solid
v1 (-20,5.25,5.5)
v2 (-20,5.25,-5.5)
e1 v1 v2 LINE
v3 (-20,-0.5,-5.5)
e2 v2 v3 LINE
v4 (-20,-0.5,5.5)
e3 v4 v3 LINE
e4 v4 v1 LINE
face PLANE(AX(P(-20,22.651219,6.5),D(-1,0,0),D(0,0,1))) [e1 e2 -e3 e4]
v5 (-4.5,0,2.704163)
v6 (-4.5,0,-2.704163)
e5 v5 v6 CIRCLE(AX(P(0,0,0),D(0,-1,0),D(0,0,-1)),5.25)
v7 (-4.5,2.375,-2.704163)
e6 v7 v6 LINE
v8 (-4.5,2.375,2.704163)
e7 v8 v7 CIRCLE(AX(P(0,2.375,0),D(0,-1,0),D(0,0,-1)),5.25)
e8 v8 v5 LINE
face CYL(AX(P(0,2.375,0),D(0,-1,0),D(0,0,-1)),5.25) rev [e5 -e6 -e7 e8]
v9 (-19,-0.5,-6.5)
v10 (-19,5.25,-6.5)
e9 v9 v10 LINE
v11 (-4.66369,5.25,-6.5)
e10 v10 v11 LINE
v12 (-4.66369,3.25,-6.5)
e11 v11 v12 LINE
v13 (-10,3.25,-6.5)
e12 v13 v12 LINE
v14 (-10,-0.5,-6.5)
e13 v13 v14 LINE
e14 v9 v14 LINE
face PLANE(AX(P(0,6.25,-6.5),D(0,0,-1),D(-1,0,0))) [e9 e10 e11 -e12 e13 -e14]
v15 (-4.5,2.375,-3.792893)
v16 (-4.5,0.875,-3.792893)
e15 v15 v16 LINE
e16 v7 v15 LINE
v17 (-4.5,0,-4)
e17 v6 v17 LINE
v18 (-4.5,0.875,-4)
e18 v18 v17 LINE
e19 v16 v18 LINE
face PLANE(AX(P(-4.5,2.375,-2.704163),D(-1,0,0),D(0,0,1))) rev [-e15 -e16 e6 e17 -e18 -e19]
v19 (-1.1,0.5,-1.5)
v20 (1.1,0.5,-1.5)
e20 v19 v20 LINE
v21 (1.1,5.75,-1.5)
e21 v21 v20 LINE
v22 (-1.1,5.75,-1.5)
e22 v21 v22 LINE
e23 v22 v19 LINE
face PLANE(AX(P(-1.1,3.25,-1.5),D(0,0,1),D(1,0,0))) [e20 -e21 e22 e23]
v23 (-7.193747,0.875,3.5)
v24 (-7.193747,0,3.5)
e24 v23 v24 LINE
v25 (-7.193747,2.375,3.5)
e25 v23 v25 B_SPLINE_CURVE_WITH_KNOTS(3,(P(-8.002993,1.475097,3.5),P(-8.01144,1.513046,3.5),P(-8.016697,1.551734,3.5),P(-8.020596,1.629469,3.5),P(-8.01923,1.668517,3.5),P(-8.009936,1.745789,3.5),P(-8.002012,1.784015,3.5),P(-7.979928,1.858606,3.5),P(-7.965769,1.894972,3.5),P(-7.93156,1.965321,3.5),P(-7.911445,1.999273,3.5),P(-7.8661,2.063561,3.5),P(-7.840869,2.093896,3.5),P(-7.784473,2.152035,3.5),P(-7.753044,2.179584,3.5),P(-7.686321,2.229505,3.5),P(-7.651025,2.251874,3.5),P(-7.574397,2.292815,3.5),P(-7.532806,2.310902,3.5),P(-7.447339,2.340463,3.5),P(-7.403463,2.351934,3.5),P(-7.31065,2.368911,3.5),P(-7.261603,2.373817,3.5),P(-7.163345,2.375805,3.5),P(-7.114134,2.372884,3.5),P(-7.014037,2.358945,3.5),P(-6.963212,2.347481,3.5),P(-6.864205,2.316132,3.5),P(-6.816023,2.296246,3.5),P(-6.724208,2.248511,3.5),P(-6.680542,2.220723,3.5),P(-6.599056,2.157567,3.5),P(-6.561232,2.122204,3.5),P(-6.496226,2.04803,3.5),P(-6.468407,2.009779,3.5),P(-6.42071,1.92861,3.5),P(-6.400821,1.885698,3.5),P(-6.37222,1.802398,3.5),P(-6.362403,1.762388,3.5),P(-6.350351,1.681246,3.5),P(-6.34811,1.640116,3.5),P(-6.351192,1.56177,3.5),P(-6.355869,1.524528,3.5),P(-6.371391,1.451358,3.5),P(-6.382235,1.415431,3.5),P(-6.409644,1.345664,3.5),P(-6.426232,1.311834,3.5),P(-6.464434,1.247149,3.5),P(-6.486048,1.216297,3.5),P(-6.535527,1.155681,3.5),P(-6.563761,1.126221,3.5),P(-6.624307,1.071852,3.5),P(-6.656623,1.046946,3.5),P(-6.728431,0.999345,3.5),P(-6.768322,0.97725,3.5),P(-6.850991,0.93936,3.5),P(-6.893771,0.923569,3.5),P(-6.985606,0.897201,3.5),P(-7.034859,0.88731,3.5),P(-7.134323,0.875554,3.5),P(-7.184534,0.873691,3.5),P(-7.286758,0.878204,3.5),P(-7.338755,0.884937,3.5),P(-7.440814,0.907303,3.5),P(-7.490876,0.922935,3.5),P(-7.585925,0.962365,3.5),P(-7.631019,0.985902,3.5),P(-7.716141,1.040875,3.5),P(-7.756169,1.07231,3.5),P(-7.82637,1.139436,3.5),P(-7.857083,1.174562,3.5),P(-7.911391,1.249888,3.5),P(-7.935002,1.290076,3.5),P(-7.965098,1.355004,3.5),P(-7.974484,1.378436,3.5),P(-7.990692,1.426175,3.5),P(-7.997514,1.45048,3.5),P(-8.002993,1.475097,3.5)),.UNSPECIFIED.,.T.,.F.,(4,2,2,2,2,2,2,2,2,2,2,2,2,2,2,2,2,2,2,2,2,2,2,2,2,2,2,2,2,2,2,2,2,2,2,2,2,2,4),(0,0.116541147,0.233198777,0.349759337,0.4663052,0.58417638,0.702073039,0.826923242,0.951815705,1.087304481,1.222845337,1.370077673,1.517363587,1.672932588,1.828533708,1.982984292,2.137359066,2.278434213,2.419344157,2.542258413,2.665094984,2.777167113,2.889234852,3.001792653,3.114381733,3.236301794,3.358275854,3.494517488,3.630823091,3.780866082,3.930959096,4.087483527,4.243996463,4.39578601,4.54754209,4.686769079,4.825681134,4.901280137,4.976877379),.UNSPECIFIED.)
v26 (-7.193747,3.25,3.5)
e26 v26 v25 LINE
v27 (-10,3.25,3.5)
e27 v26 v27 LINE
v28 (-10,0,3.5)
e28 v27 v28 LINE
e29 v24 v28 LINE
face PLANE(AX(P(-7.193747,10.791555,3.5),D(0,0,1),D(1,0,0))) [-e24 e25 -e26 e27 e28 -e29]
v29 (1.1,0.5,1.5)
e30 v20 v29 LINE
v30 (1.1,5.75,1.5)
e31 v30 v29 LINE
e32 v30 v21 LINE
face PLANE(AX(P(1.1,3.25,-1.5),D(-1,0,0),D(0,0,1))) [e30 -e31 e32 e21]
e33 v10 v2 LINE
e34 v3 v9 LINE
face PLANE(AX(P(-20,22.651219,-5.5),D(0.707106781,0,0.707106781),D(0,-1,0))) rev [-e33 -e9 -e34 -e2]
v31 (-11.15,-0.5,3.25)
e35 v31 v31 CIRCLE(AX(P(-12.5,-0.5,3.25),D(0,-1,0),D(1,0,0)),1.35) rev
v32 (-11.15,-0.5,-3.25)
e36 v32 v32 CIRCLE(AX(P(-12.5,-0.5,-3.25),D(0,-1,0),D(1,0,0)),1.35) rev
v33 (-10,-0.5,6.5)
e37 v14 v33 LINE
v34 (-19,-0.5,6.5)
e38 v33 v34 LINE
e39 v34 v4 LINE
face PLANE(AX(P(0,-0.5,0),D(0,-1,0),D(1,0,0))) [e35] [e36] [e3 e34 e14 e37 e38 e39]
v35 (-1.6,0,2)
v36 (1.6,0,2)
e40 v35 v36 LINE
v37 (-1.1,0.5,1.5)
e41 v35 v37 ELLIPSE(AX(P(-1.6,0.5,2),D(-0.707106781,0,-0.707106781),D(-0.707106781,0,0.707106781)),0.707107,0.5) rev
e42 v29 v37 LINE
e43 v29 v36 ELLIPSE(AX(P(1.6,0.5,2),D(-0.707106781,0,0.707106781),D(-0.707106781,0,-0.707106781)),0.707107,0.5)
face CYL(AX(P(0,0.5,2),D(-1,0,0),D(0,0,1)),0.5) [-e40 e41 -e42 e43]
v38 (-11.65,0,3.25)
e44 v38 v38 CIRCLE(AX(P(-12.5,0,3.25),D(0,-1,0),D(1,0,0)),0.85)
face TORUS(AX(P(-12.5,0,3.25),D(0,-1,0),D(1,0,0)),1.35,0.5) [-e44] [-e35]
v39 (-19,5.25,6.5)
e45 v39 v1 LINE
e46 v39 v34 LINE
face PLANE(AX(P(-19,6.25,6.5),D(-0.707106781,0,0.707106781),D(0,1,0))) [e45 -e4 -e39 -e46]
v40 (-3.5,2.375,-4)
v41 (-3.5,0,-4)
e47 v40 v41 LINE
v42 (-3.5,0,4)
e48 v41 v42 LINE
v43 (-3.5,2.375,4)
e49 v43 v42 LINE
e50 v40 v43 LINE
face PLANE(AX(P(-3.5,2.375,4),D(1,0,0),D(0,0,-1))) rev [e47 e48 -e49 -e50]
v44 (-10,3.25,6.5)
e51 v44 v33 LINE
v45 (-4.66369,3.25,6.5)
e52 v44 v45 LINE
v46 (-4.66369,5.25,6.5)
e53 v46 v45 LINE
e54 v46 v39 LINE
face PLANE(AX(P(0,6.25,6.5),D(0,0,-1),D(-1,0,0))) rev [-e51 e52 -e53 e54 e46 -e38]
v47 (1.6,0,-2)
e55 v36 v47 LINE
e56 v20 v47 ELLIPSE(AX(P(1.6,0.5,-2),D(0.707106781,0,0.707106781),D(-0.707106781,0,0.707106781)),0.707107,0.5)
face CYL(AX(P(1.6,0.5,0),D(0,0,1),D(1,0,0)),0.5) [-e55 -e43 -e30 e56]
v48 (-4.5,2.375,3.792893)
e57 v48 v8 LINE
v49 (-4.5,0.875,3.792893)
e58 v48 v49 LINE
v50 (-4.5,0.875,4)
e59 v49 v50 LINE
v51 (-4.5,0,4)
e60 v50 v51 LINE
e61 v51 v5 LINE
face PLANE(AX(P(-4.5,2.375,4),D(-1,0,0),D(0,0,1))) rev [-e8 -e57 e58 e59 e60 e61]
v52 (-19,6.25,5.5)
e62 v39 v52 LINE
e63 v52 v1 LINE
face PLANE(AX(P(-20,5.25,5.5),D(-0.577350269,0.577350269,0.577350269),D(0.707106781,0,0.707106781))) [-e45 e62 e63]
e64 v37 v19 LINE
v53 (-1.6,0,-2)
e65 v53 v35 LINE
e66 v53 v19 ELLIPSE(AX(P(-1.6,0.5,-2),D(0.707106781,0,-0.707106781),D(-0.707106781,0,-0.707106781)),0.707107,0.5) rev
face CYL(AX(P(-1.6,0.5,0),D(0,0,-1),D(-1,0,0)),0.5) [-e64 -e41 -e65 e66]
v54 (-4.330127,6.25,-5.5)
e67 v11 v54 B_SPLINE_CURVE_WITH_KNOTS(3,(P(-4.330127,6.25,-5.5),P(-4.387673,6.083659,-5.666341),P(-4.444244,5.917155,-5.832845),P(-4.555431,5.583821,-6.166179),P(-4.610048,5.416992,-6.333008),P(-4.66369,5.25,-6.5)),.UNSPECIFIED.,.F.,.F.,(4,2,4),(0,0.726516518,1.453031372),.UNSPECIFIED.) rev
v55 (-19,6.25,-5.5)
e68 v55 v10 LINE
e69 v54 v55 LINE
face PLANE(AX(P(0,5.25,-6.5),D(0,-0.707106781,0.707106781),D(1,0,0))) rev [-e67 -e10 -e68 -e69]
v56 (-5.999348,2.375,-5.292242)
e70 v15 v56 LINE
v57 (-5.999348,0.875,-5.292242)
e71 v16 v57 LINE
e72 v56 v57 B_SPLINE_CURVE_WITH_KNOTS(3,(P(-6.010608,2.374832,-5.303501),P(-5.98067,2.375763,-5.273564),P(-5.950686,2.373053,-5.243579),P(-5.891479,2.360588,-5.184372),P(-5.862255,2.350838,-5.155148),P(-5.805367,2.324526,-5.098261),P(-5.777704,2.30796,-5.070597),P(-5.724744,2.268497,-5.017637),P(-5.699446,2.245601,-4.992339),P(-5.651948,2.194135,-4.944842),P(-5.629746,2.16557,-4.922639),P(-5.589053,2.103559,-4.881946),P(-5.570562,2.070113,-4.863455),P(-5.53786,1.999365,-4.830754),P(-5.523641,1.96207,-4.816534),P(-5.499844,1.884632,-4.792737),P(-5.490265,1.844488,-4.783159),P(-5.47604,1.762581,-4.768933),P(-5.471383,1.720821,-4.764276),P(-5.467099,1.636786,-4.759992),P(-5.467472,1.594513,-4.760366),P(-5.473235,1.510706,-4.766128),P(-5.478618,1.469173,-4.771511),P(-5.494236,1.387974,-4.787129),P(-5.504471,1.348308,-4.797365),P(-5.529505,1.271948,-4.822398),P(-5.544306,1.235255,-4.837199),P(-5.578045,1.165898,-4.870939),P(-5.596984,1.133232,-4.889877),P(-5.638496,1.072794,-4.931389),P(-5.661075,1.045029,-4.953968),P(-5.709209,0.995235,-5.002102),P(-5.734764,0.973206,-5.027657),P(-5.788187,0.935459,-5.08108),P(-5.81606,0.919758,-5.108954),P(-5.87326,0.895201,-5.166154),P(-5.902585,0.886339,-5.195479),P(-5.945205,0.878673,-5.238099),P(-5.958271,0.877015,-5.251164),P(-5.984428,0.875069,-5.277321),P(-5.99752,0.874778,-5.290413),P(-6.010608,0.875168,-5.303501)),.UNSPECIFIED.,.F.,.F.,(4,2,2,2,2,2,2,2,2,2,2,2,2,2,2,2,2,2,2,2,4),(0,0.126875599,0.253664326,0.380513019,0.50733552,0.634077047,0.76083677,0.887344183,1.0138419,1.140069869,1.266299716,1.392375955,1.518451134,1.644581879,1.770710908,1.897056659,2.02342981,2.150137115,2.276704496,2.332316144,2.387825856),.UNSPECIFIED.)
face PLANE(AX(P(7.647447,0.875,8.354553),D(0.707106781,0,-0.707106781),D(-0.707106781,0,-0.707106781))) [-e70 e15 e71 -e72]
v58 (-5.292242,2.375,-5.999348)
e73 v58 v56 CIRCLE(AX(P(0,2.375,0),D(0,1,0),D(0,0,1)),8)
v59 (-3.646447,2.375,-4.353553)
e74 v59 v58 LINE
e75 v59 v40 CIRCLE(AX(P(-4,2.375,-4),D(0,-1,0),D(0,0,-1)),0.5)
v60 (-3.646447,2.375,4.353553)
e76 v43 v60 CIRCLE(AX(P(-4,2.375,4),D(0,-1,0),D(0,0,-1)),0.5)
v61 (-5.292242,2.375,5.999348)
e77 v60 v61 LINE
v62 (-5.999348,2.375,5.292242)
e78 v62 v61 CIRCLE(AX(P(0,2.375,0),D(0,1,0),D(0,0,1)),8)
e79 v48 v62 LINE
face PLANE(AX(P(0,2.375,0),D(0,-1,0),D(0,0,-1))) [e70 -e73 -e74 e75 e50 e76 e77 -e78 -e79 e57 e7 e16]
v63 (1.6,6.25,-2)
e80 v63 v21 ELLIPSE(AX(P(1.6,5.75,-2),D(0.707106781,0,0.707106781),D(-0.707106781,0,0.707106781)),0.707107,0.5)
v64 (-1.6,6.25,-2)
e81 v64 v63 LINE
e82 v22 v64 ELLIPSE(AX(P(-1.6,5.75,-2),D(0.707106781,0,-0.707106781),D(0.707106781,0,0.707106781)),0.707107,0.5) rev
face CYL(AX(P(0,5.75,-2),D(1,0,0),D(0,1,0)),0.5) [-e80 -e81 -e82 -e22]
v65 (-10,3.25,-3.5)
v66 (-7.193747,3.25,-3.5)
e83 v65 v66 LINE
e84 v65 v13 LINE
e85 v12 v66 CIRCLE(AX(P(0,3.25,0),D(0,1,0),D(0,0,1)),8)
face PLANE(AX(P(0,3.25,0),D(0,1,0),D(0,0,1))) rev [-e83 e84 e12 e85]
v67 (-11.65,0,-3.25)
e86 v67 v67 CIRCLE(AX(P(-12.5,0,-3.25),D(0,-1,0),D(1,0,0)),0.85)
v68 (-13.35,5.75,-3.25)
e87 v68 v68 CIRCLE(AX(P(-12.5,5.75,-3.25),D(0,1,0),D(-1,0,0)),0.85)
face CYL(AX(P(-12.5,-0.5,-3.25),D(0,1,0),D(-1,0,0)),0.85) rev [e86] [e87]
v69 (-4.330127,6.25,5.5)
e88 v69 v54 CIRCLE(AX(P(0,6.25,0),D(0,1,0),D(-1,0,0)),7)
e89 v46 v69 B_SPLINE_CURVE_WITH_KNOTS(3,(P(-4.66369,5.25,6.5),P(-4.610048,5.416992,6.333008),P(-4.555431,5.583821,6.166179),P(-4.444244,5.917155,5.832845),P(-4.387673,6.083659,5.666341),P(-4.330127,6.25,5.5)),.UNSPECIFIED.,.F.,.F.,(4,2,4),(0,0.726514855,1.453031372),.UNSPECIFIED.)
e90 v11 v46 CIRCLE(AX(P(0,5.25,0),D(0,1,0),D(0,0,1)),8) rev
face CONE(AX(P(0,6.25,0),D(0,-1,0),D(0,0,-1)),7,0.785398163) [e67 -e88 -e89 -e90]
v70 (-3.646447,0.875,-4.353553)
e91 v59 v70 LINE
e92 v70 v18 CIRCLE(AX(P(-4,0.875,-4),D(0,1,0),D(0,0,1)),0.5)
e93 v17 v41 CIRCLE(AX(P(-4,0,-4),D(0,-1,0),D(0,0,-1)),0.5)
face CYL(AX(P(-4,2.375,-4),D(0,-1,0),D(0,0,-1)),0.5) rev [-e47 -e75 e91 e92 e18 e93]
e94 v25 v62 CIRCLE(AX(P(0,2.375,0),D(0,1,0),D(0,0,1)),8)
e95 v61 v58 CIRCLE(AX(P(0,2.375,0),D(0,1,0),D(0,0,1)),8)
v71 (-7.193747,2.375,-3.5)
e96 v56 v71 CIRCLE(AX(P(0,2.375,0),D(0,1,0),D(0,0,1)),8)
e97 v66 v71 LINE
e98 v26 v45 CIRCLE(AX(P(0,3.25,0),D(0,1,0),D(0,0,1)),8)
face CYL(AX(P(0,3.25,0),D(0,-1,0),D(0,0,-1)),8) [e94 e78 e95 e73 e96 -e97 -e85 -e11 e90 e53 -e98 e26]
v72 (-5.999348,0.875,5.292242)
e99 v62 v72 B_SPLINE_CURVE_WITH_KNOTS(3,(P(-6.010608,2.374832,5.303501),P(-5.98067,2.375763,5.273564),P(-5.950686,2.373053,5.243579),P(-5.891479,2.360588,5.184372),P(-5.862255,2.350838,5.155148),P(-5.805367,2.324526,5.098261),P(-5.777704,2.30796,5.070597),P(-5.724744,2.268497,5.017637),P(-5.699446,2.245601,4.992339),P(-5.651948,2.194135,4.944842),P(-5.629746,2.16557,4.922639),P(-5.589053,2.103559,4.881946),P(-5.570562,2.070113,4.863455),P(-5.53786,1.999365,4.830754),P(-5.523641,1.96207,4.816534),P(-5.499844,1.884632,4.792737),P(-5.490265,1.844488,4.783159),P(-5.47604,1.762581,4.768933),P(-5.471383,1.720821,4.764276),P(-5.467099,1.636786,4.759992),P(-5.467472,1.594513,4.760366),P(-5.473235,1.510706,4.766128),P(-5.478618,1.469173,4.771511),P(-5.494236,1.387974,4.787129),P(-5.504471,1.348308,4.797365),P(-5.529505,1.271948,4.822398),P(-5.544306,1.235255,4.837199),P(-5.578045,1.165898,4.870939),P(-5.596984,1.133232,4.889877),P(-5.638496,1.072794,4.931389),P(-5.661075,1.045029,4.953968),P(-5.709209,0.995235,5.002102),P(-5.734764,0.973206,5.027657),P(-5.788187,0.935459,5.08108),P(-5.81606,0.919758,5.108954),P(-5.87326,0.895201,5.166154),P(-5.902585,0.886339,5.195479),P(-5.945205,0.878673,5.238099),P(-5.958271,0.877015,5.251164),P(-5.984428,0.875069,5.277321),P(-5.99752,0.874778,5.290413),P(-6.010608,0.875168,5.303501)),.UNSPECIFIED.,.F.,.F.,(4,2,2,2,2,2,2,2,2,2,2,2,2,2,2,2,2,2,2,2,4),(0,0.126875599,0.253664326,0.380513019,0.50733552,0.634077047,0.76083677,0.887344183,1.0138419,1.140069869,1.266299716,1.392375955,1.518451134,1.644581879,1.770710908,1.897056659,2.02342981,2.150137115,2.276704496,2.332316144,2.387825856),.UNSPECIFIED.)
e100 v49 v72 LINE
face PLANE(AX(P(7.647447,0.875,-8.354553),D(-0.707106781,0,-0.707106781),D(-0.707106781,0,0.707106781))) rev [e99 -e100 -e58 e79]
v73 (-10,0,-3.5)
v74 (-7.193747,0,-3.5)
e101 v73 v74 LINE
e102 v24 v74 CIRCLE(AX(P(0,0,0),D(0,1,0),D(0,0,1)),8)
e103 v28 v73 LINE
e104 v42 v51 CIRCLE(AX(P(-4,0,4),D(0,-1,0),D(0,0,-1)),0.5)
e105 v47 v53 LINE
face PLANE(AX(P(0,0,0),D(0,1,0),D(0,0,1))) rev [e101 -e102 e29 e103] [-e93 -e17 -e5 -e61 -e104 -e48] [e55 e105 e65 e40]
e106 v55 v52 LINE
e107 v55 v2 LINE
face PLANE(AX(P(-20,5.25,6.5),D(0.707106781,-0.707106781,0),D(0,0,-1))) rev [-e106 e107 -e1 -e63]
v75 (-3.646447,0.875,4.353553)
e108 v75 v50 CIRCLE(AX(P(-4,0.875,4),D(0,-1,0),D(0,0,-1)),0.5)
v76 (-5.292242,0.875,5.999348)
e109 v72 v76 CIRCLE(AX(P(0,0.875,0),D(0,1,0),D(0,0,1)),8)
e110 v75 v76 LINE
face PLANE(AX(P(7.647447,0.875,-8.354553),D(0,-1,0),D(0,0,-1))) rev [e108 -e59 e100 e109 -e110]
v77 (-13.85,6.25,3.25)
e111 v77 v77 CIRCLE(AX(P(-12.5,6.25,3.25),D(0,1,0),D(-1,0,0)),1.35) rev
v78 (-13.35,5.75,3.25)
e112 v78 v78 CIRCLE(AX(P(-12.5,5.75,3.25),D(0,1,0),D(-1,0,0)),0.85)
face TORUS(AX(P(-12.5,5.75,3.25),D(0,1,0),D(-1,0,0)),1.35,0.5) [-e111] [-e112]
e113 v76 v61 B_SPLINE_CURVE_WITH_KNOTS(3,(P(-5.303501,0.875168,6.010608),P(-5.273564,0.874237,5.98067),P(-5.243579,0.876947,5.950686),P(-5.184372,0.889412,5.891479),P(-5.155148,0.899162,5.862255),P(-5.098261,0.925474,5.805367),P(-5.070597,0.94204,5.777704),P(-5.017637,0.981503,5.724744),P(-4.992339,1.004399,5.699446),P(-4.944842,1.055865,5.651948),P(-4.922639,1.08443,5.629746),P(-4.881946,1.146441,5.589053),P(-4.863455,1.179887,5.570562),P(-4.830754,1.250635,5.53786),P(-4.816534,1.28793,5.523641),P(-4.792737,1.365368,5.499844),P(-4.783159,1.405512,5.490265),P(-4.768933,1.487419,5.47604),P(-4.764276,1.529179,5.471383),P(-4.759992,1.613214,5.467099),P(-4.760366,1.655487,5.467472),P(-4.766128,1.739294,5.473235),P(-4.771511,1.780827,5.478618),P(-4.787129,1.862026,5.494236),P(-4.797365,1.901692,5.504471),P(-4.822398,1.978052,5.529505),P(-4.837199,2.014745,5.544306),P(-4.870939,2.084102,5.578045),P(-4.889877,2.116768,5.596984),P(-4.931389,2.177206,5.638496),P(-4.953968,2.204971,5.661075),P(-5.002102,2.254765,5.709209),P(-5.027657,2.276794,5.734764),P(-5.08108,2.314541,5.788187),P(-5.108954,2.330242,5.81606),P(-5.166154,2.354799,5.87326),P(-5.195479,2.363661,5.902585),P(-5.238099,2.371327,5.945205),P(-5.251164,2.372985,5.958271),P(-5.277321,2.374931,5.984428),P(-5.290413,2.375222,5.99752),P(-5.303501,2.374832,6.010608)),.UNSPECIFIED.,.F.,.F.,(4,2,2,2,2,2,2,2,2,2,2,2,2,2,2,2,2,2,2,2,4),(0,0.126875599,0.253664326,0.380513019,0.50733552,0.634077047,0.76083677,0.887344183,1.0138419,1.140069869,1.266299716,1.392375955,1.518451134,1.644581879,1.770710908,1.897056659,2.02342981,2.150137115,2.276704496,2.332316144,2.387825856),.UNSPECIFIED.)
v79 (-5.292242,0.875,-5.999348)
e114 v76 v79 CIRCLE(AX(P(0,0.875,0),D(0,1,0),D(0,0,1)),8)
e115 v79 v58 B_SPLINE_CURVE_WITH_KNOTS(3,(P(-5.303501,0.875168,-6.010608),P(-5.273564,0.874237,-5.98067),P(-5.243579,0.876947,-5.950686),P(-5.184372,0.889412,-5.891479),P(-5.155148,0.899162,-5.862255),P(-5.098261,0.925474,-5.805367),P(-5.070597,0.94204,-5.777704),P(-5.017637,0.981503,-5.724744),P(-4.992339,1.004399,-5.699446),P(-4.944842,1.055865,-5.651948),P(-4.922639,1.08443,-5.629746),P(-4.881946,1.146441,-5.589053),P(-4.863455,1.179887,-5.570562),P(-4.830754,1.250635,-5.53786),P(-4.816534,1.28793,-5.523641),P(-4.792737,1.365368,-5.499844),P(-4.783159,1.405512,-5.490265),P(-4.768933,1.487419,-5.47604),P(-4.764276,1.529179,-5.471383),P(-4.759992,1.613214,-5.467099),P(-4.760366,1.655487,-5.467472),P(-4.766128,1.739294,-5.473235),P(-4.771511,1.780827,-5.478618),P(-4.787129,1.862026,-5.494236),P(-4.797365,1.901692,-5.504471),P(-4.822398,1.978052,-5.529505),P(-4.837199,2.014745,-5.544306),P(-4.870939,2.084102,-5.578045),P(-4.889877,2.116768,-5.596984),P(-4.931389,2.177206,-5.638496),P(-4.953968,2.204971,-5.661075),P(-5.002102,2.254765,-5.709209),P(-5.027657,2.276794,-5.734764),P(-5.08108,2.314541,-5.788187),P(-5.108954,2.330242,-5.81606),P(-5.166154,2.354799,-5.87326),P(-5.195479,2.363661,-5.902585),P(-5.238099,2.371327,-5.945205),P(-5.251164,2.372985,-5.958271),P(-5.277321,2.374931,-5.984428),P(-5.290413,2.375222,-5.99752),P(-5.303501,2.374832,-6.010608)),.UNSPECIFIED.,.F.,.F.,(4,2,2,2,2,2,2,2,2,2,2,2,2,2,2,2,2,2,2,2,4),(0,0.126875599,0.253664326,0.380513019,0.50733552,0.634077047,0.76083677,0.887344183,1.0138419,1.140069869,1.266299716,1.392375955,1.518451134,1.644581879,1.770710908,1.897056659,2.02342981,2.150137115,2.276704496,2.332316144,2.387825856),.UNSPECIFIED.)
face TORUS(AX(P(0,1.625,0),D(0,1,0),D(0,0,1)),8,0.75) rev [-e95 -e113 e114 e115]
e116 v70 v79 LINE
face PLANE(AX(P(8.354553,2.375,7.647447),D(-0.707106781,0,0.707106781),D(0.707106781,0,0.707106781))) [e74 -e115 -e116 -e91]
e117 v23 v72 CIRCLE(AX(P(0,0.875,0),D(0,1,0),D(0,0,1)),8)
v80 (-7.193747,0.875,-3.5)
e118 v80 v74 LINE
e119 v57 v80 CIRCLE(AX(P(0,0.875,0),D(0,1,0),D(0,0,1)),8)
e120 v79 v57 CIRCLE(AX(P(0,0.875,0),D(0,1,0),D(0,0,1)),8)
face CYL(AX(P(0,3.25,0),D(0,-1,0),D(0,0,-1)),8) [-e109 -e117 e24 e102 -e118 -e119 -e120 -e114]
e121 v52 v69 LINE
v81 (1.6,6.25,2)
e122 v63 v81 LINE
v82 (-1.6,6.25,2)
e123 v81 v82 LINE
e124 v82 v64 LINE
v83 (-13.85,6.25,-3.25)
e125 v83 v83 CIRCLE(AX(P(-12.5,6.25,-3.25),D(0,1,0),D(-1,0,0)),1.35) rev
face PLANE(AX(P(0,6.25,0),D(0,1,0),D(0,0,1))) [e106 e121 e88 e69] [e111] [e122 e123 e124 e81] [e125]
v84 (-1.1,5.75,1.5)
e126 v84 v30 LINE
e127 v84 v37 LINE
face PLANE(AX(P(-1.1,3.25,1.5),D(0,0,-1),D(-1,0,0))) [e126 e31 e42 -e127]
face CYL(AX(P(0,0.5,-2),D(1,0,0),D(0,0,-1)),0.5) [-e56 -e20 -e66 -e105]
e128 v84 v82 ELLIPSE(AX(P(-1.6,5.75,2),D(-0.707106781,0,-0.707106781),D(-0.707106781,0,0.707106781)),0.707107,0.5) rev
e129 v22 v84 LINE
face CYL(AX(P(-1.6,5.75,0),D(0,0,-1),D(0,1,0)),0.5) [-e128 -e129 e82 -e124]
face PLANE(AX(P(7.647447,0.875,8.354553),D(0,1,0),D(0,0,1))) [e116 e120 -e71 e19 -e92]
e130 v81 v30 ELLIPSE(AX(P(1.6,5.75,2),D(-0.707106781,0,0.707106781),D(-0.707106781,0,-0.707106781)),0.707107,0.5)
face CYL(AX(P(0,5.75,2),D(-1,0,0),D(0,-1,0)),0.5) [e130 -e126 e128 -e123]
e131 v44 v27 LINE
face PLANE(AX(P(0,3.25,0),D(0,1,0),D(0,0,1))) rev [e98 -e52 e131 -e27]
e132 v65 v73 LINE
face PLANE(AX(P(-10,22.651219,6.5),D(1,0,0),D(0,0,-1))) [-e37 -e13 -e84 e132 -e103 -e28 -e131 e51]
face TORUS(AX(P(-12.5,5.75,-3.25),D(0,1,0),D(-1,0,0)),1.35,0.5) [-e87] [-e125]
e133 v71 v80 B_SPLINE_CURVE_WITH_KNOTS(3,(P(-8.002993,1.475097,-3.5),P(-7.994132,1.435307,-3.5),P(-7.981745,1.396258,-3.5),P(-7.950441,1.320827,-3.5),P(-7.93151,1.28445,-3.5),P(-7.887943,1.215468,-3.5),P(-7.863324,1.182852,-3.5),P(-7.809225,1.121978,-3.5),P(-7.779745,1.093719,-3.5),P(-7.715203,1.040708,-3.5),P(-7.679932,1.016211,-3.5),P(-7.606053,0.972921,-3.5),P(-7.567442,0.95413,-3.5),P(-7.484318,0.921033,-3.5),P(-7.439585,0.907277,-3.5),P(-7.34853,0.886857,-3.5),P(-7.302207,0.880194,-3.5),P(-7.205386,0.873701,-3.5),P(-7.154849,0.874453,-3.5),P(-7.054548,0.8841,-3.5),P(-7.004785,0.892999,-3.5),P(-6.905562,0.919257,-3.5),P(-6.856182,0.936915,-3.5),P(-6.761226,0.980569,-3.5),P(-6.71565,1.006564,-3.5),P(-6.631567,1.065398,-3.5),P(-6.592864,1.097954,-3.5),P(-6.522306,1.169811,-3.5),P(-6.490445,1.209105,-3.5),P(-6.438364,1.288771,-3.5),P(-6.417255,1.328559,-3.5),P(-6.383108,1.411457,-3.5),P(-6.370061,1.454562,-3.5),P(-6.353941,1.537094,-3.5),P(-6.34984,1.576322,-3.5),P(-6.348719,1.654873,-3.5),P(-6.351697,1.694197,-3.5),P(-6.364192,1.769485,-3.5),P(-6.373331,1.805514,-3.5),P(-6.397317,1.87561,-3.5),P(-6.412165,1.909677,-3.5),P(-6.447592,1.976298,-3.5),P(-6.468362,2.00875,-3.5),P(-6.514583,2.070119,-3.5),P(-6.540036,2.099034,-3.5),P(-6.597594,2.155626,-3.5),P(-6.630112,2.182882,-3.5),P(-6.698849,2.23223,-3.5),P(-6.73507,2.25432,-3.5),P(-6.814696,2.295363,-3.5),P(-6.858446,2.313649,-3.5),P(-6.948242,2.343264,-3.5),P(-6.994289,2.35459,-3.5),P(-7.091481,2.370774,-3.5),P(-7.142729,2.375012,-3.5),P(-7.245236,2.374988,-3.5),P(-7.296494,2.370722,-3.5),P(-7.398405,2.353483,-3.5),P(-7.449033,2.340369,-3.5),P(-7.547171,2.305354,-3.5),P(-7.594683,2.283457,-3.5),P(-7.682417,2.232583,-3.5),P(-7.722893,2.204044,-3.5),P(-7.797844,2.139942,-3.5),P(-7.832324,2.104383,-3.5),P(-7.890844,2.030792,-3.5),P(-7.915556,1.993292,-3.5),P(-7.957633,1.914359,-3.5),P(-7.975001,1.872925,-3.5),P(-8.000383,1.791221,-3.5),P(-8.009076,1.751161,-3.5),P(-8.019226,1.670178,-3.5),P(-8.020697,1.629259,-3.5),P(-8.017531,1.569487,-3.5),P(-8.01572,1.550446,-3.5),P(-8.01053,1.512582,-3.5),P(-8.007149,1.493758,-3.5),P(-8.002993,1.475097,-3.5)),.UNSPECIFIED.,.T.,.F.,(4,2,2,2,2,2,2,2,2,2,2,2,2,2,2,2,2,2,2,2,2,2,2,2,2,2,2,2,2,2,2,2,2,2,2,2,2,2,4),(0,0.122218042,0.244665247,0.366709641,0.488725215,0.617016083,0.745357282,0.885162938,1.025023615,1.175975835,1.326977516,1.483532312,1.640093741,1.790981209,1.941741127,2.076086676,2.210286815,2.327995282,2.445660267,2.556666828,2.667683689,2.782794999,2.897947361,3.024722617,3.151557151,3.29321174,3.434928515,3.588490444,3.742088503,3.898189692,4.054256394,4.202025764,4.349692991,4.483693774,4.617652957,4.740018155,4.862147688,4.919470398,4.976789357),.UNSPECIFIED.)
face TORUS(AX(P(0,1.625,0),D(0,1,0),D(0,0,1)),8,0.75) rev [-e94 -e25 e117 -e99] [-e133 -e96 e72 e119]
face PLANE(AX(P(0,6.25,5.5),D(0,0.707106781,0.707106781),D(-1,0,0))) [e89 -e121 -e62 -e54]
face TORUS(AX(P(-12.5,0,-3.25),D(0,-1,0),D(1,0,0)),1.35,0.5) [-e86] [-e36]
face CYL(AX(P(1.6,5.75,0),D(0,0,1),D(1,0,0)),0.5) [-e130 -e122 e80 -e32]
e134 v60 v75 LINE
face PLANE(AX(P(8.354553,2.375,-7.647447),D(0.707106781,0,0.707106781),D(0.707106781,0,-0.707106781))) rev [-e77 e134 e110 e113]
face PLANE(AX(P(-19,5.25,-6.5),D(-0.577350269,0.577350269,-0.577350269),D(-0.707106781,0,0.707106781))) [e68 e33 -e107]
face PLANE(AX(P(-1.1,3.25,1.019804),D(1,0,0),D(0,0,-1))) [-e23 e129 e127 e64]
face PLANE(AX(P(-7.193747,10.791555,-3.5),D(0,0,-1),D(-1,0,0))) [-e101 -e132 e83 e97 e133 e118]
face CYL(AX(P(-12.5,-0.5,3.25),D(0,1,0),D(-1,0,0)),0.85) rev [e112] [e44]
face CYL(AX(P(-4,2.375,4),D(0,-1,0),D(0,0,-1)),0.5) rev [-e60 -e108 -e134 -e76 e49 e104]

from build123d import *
from build123d.topology import SkipClean

# Parameters (mm, degrees)
SKETCH1_R               = 8
BOSS_EXTRUDE1_DEPTH     = 3.25
SKETCH3_R               = 8
SKETCH3_W               = 2.2
SKETCH3_H               = 3
BOSS_EXTRUDE2_DEPTH     = 3
BOSS_EXTRUDE3_START     = -3
SKETCH4_W               = 10
SKETCH4_H               = 13
BOSS_EXTRUDE3_DEPTH     = 6.75
CUT_EXTRUDE1_DEPTH      = 23.57349109
CUT_EXTRUDE1_DEPTH_BACK = 23.57349109
SKETCH5_R               = 0.85
CUT_EXTRUDE2_DEPTH      = 2.375
CUT_EXTRUDE3_REACH      = 22.768
CUT_EXTRUDE3_END_RADIUS = 0.5
SKETCH7_W               = 1
SKETCH7_H               = 1.5
CUT_EXTRUDE4_REACH      = 22.768
CUT_EXTRUDE4_END_RADIUS = 0.5
SKETCH8_W               = 1
SKETCH8_H               = 1.5
FILLET1_R               = 0.5
CHAMFER1_SIZE           = 1
BOSS_EXTRUDE4_START     = -3.25
BOSS_EXTRUDE4_DEPTH     = 3.25


# Read off the part's stored shape, not the designer's step: Cut-Revolve2
with BuildPart() as part:
    # Sketch1 → Boss-Extrude1 (new body)
    with BuildSketch(Plane(origin=(0, 0, 0), x_dir=(1, 0, 0), z_dir=(0, 1, 0))):
        with Locations(Location((0, 0, 0), (0, 0, 90))):
            Circle(SKETCH1_R)
        Polygon((-1.1, 1.019803903), (-1.1, -1.019803903), (-1.1, -1.5), (1.1, -1.5), (1.1, -1.019803903), (1.1, 1.019803903), (1.1, 1.5), (-1.1, 1.5), align=None, mode=Mode.SUBTRACT)
    extrude(amount=BOSS_EXTRUDE1_DEPTH)

    # Sketch2 → Cut-Revolve1 (revolve, cut)
    with BuildSketch(Plane(origin=(0, 0, 0), x_dir=(0, 0, -1), z_dir=(1, 0, 0))):
        with BuildLine():
            Line((8, 0.875), (8, 2.375))
            ThreePointArc((8, 2.375), (7.25, 1.625), (8, 0.875))
        make_face()
    revolve(axis=Axis((0, 3.25, 0), (0, -1, 0)), mode=Mode.SUBTRACT)

    # Sketch3 → Boss-Extrude2 (add)
    # profile 1 of 2: a face of its own
    with BuildSketch(Plane(origin=(0, 3.25, 0), x_dir=(1, 0, 0), z_dir=(0, 1, 0))):
        with Locations(Location((0, 0, 0), (0, 0, 125.659087696))):
            Circle(SKETCH3_R)
        Rectangle(SKETCH3_W, SKETCH3_H, mode=Mode.SUBTRACT)
    # profile 2 of 2: a face of its own
    with BuildSketch(Plane(origin=(0, 3.25, 0), x_dir=(1, 0, 0), z_dir=(0, 1, 0))):
        with BuildLine():
            Line((-4.663689527, 6.5), (-15, 6.5))
            Line((-15, 6.5), (-15, -6.5))
            Line((-15, -6.5), (-4.663689527, -6.5))
            ThreePointArc((-4.663689527, -6.5), (-8, 0), (-4.663689527, 6.5))
        make_face()
    extrude(amount=BOSS_EXTRUDE2_DEPTH)

    # Sketch4 → Boss-Extrude3 (add)
    with BuildSketch(Plane.XZ.offset(-3.25).offset(BOSS_EXTRUDE3_START)):
        with Locations((-15, 0)):
            Rectangle(SKETCH4_W, SKETCH4_H)
    extrude(amount=BOSS_EXTRUDE3_DEPTH)

    # Sketch5 → Cut-Extrude1 (cut, two sides: drawn at the far end of the back side and taken through both)
    with BuildSketch(Plane(origin=(0, 6.25, 0), x_dir=(1, 0, 0), z_dir=(0, 1, 0)).offset(-CUT_EXTRUDE1_DEPTH_BACK)):
        with Locations(Location((-12.5, 3.25, 0), (0, 0, 180))):
            Circle(SKETCH5_R)
        with Locations(Location((-12.5, -3.25, 0), (0, 0, 180))):
            Circle(SKETCH5_R)
    extrude(amount=CUT_EXTRUDE1_DEPTH + CUT_EXTRUDE1_DEPTH_BACK, mode=Mode.SUBTRACT)

    # Sketch6 → Cut-Extrude2 (cut)
    with BuildSketch(Plane(origin=(0, 0, 0), x_dir=(-1, 0, 0), z_dir=(0, -1, 0))):
        with BuildLine():
            Line((3.5, -4), (3.5, 4))
            ThreePointArc((3.5, 4), (4, 4.5), (4.5, 4))
            Line((4.5, 4), (4.5, 2.704163457))
            ThreePointArc((4.5, 2.704163457), (5.25, 0), (4.5, -2.704163457))
            Line((4.5, -2.704163457), (4.5, -4))
            ThreePointArc((4.5, -4), (4, -4.5), (3.5, -4))
        make_face()
    extrude(amount=-CUT_EXTRUDE2_DEPTH, mode=Mode.SUBTRACT)

    # Cut-Extrude3: up to this cylinder (the profile starts outside it)
    cut_extrude3_end = Plane(origin=(-4, 1.625, 4), z_dir=(0, -1, 0)) * Cylinder(CUT_EXTRUDE3_END_RADIUS, 47.536, mode=Mode.PRIVATE)
    # Sketch7 → Cut-Extrude3 (cut, up to the surface)
    with BuildSketch(Plane(origin=(-5.656854249, 0, 5.656854249), x_dir=(0.707106781186546, 0, 0.7071067811865491), z_dir=(-0.7071067811865491, 0, 0.707106781186546)), mode=Mode.PRIVATE) as cut_extrude3_sk1:
        with Locations((0, 1.625)):
            Rectangle(SKETCH7_W, SKETCH7_H)
    cut_extrude3_tool1 = extrude(cut_extrude3_sk1.sketch, amount=-CUT_EXTRUDE3_REACH, mode=Mode.PRIVATE) - cut_extrude3_end
    add(cut_extrude3_tool1.solids().sort_by_distance((-5.656854, 1.625, 5.656854))[0], mode=Mode.SUBTRACT)

    # Cut-Extrude4: up to this cylinder (the profile starts outside it)
    cut_extrude4_end = Plane(origin=(-4, 1.625, -4), z_dir=(0, -1, 0)) * Cylinder(CUT_EXTRUDE4_END_RADIUS, 47.536, mode=Mode.PRIVATE)
    # Sketch8 → Cut-Extrude4 (cut, up to the surface)
    with BuildSketch(Plane(origin=(-5.656854249, 0, -5.656854249), x_dir=(0.7071067811865457, 0, -0.7071067811865493), z_dir=(0.7071067811865493, 0, 0.7071067811865457)), mode=Mode.PRIVATE) as cut_extrude4_sk1:
        with Locations((0, 1.625)):
            Rectangle(SKETCH8_W, SKETCH8_H)
    cut_extrude4_tool1 = extrude(cut_extrude4_sk1.sketch, amount=CUT_EXTRUDE4_REACH, mode=Mode.PRIVATE) - cut_extrude4_end
    add(cut_extrude4_tool1.solids().sort_by_distance((-5.656854, 1.625, -5.656854))[0], mode=Mode.SUBTRACT)

    # Fillet1
    fillet1_edges = [part.edges().sort_by_distance(p)[0] for p in [
        (1.1, 6.25, 0),
        (0, 6.25, 1.5),
        (-1.1, 6.25, 0),
        (0, 6.25, -1.5),
        (-11.65, 6.25, -3.25),
        (-11.65, -0.5, -3.25),
        (-11.65, 6.25, 3.25),
        (-11.65, -0.5, 3.25),
        (-1.1, 0, 0),
        (0, 0, 1.5),
        (1.1, 0, 0),
        (0, 0, -1.5),
    ]]
    fillet(fillet1_edges, radius=FILLET1_R)

    # Chamfer1
    chamfer1_edges = [part.edges().sort_by_distance(p)[0] for p in [
        (-12.331844763, 6.25, -6.5),
        (8, 6.25, 0),
        (-12.331844763, 6.25, 6.5),
        (-20, 2.875, 6.5),
        (-20, 6.25, 0),
        (-20, 2.875, -6.5),
    ]]
    chamfer(chamfer1_edges, length=CHAMFER1_SIZE)

    # Sketch9 → Boss-Extrude4 (add)
    with BuildSketch(Plane.XZ.offset(BOSS_EXTRUDE4_START)):
        with BuildLine():
            Line((-7.193747285, -3.5), (-10, -3.5))
            Line((-10, -3.5), (-10, 3.5))
            Line((-10, 3.5), (-7.193747285, 3.5))
            ThreePointArc((-7.193747285, 3.5), (-8, 0), (-7.193747285, -3.5))
        make_face()
    extrude(amount=BOSS_EXTRUDE4_DEPTH)

    # Cut-Revolve2 outline → Cut-Revolve2 (revolve, cut)
    with SkipClean():  # the faces are left unmerged after this step: merging them gives an invalid solid
        with BuildSketch(Plane.XY):
            with BuildLine():
                ThreePointArc((8, 0.875), (8.75, 1.625), (8, 2.375))
                Line((8, 2.375), (8, 0.875))
            make_face()
        revolve(axis=Axis((0, 0, 0), (0, 1, 0)), mode=Mode.SUBTRACT)


solid = part.part
